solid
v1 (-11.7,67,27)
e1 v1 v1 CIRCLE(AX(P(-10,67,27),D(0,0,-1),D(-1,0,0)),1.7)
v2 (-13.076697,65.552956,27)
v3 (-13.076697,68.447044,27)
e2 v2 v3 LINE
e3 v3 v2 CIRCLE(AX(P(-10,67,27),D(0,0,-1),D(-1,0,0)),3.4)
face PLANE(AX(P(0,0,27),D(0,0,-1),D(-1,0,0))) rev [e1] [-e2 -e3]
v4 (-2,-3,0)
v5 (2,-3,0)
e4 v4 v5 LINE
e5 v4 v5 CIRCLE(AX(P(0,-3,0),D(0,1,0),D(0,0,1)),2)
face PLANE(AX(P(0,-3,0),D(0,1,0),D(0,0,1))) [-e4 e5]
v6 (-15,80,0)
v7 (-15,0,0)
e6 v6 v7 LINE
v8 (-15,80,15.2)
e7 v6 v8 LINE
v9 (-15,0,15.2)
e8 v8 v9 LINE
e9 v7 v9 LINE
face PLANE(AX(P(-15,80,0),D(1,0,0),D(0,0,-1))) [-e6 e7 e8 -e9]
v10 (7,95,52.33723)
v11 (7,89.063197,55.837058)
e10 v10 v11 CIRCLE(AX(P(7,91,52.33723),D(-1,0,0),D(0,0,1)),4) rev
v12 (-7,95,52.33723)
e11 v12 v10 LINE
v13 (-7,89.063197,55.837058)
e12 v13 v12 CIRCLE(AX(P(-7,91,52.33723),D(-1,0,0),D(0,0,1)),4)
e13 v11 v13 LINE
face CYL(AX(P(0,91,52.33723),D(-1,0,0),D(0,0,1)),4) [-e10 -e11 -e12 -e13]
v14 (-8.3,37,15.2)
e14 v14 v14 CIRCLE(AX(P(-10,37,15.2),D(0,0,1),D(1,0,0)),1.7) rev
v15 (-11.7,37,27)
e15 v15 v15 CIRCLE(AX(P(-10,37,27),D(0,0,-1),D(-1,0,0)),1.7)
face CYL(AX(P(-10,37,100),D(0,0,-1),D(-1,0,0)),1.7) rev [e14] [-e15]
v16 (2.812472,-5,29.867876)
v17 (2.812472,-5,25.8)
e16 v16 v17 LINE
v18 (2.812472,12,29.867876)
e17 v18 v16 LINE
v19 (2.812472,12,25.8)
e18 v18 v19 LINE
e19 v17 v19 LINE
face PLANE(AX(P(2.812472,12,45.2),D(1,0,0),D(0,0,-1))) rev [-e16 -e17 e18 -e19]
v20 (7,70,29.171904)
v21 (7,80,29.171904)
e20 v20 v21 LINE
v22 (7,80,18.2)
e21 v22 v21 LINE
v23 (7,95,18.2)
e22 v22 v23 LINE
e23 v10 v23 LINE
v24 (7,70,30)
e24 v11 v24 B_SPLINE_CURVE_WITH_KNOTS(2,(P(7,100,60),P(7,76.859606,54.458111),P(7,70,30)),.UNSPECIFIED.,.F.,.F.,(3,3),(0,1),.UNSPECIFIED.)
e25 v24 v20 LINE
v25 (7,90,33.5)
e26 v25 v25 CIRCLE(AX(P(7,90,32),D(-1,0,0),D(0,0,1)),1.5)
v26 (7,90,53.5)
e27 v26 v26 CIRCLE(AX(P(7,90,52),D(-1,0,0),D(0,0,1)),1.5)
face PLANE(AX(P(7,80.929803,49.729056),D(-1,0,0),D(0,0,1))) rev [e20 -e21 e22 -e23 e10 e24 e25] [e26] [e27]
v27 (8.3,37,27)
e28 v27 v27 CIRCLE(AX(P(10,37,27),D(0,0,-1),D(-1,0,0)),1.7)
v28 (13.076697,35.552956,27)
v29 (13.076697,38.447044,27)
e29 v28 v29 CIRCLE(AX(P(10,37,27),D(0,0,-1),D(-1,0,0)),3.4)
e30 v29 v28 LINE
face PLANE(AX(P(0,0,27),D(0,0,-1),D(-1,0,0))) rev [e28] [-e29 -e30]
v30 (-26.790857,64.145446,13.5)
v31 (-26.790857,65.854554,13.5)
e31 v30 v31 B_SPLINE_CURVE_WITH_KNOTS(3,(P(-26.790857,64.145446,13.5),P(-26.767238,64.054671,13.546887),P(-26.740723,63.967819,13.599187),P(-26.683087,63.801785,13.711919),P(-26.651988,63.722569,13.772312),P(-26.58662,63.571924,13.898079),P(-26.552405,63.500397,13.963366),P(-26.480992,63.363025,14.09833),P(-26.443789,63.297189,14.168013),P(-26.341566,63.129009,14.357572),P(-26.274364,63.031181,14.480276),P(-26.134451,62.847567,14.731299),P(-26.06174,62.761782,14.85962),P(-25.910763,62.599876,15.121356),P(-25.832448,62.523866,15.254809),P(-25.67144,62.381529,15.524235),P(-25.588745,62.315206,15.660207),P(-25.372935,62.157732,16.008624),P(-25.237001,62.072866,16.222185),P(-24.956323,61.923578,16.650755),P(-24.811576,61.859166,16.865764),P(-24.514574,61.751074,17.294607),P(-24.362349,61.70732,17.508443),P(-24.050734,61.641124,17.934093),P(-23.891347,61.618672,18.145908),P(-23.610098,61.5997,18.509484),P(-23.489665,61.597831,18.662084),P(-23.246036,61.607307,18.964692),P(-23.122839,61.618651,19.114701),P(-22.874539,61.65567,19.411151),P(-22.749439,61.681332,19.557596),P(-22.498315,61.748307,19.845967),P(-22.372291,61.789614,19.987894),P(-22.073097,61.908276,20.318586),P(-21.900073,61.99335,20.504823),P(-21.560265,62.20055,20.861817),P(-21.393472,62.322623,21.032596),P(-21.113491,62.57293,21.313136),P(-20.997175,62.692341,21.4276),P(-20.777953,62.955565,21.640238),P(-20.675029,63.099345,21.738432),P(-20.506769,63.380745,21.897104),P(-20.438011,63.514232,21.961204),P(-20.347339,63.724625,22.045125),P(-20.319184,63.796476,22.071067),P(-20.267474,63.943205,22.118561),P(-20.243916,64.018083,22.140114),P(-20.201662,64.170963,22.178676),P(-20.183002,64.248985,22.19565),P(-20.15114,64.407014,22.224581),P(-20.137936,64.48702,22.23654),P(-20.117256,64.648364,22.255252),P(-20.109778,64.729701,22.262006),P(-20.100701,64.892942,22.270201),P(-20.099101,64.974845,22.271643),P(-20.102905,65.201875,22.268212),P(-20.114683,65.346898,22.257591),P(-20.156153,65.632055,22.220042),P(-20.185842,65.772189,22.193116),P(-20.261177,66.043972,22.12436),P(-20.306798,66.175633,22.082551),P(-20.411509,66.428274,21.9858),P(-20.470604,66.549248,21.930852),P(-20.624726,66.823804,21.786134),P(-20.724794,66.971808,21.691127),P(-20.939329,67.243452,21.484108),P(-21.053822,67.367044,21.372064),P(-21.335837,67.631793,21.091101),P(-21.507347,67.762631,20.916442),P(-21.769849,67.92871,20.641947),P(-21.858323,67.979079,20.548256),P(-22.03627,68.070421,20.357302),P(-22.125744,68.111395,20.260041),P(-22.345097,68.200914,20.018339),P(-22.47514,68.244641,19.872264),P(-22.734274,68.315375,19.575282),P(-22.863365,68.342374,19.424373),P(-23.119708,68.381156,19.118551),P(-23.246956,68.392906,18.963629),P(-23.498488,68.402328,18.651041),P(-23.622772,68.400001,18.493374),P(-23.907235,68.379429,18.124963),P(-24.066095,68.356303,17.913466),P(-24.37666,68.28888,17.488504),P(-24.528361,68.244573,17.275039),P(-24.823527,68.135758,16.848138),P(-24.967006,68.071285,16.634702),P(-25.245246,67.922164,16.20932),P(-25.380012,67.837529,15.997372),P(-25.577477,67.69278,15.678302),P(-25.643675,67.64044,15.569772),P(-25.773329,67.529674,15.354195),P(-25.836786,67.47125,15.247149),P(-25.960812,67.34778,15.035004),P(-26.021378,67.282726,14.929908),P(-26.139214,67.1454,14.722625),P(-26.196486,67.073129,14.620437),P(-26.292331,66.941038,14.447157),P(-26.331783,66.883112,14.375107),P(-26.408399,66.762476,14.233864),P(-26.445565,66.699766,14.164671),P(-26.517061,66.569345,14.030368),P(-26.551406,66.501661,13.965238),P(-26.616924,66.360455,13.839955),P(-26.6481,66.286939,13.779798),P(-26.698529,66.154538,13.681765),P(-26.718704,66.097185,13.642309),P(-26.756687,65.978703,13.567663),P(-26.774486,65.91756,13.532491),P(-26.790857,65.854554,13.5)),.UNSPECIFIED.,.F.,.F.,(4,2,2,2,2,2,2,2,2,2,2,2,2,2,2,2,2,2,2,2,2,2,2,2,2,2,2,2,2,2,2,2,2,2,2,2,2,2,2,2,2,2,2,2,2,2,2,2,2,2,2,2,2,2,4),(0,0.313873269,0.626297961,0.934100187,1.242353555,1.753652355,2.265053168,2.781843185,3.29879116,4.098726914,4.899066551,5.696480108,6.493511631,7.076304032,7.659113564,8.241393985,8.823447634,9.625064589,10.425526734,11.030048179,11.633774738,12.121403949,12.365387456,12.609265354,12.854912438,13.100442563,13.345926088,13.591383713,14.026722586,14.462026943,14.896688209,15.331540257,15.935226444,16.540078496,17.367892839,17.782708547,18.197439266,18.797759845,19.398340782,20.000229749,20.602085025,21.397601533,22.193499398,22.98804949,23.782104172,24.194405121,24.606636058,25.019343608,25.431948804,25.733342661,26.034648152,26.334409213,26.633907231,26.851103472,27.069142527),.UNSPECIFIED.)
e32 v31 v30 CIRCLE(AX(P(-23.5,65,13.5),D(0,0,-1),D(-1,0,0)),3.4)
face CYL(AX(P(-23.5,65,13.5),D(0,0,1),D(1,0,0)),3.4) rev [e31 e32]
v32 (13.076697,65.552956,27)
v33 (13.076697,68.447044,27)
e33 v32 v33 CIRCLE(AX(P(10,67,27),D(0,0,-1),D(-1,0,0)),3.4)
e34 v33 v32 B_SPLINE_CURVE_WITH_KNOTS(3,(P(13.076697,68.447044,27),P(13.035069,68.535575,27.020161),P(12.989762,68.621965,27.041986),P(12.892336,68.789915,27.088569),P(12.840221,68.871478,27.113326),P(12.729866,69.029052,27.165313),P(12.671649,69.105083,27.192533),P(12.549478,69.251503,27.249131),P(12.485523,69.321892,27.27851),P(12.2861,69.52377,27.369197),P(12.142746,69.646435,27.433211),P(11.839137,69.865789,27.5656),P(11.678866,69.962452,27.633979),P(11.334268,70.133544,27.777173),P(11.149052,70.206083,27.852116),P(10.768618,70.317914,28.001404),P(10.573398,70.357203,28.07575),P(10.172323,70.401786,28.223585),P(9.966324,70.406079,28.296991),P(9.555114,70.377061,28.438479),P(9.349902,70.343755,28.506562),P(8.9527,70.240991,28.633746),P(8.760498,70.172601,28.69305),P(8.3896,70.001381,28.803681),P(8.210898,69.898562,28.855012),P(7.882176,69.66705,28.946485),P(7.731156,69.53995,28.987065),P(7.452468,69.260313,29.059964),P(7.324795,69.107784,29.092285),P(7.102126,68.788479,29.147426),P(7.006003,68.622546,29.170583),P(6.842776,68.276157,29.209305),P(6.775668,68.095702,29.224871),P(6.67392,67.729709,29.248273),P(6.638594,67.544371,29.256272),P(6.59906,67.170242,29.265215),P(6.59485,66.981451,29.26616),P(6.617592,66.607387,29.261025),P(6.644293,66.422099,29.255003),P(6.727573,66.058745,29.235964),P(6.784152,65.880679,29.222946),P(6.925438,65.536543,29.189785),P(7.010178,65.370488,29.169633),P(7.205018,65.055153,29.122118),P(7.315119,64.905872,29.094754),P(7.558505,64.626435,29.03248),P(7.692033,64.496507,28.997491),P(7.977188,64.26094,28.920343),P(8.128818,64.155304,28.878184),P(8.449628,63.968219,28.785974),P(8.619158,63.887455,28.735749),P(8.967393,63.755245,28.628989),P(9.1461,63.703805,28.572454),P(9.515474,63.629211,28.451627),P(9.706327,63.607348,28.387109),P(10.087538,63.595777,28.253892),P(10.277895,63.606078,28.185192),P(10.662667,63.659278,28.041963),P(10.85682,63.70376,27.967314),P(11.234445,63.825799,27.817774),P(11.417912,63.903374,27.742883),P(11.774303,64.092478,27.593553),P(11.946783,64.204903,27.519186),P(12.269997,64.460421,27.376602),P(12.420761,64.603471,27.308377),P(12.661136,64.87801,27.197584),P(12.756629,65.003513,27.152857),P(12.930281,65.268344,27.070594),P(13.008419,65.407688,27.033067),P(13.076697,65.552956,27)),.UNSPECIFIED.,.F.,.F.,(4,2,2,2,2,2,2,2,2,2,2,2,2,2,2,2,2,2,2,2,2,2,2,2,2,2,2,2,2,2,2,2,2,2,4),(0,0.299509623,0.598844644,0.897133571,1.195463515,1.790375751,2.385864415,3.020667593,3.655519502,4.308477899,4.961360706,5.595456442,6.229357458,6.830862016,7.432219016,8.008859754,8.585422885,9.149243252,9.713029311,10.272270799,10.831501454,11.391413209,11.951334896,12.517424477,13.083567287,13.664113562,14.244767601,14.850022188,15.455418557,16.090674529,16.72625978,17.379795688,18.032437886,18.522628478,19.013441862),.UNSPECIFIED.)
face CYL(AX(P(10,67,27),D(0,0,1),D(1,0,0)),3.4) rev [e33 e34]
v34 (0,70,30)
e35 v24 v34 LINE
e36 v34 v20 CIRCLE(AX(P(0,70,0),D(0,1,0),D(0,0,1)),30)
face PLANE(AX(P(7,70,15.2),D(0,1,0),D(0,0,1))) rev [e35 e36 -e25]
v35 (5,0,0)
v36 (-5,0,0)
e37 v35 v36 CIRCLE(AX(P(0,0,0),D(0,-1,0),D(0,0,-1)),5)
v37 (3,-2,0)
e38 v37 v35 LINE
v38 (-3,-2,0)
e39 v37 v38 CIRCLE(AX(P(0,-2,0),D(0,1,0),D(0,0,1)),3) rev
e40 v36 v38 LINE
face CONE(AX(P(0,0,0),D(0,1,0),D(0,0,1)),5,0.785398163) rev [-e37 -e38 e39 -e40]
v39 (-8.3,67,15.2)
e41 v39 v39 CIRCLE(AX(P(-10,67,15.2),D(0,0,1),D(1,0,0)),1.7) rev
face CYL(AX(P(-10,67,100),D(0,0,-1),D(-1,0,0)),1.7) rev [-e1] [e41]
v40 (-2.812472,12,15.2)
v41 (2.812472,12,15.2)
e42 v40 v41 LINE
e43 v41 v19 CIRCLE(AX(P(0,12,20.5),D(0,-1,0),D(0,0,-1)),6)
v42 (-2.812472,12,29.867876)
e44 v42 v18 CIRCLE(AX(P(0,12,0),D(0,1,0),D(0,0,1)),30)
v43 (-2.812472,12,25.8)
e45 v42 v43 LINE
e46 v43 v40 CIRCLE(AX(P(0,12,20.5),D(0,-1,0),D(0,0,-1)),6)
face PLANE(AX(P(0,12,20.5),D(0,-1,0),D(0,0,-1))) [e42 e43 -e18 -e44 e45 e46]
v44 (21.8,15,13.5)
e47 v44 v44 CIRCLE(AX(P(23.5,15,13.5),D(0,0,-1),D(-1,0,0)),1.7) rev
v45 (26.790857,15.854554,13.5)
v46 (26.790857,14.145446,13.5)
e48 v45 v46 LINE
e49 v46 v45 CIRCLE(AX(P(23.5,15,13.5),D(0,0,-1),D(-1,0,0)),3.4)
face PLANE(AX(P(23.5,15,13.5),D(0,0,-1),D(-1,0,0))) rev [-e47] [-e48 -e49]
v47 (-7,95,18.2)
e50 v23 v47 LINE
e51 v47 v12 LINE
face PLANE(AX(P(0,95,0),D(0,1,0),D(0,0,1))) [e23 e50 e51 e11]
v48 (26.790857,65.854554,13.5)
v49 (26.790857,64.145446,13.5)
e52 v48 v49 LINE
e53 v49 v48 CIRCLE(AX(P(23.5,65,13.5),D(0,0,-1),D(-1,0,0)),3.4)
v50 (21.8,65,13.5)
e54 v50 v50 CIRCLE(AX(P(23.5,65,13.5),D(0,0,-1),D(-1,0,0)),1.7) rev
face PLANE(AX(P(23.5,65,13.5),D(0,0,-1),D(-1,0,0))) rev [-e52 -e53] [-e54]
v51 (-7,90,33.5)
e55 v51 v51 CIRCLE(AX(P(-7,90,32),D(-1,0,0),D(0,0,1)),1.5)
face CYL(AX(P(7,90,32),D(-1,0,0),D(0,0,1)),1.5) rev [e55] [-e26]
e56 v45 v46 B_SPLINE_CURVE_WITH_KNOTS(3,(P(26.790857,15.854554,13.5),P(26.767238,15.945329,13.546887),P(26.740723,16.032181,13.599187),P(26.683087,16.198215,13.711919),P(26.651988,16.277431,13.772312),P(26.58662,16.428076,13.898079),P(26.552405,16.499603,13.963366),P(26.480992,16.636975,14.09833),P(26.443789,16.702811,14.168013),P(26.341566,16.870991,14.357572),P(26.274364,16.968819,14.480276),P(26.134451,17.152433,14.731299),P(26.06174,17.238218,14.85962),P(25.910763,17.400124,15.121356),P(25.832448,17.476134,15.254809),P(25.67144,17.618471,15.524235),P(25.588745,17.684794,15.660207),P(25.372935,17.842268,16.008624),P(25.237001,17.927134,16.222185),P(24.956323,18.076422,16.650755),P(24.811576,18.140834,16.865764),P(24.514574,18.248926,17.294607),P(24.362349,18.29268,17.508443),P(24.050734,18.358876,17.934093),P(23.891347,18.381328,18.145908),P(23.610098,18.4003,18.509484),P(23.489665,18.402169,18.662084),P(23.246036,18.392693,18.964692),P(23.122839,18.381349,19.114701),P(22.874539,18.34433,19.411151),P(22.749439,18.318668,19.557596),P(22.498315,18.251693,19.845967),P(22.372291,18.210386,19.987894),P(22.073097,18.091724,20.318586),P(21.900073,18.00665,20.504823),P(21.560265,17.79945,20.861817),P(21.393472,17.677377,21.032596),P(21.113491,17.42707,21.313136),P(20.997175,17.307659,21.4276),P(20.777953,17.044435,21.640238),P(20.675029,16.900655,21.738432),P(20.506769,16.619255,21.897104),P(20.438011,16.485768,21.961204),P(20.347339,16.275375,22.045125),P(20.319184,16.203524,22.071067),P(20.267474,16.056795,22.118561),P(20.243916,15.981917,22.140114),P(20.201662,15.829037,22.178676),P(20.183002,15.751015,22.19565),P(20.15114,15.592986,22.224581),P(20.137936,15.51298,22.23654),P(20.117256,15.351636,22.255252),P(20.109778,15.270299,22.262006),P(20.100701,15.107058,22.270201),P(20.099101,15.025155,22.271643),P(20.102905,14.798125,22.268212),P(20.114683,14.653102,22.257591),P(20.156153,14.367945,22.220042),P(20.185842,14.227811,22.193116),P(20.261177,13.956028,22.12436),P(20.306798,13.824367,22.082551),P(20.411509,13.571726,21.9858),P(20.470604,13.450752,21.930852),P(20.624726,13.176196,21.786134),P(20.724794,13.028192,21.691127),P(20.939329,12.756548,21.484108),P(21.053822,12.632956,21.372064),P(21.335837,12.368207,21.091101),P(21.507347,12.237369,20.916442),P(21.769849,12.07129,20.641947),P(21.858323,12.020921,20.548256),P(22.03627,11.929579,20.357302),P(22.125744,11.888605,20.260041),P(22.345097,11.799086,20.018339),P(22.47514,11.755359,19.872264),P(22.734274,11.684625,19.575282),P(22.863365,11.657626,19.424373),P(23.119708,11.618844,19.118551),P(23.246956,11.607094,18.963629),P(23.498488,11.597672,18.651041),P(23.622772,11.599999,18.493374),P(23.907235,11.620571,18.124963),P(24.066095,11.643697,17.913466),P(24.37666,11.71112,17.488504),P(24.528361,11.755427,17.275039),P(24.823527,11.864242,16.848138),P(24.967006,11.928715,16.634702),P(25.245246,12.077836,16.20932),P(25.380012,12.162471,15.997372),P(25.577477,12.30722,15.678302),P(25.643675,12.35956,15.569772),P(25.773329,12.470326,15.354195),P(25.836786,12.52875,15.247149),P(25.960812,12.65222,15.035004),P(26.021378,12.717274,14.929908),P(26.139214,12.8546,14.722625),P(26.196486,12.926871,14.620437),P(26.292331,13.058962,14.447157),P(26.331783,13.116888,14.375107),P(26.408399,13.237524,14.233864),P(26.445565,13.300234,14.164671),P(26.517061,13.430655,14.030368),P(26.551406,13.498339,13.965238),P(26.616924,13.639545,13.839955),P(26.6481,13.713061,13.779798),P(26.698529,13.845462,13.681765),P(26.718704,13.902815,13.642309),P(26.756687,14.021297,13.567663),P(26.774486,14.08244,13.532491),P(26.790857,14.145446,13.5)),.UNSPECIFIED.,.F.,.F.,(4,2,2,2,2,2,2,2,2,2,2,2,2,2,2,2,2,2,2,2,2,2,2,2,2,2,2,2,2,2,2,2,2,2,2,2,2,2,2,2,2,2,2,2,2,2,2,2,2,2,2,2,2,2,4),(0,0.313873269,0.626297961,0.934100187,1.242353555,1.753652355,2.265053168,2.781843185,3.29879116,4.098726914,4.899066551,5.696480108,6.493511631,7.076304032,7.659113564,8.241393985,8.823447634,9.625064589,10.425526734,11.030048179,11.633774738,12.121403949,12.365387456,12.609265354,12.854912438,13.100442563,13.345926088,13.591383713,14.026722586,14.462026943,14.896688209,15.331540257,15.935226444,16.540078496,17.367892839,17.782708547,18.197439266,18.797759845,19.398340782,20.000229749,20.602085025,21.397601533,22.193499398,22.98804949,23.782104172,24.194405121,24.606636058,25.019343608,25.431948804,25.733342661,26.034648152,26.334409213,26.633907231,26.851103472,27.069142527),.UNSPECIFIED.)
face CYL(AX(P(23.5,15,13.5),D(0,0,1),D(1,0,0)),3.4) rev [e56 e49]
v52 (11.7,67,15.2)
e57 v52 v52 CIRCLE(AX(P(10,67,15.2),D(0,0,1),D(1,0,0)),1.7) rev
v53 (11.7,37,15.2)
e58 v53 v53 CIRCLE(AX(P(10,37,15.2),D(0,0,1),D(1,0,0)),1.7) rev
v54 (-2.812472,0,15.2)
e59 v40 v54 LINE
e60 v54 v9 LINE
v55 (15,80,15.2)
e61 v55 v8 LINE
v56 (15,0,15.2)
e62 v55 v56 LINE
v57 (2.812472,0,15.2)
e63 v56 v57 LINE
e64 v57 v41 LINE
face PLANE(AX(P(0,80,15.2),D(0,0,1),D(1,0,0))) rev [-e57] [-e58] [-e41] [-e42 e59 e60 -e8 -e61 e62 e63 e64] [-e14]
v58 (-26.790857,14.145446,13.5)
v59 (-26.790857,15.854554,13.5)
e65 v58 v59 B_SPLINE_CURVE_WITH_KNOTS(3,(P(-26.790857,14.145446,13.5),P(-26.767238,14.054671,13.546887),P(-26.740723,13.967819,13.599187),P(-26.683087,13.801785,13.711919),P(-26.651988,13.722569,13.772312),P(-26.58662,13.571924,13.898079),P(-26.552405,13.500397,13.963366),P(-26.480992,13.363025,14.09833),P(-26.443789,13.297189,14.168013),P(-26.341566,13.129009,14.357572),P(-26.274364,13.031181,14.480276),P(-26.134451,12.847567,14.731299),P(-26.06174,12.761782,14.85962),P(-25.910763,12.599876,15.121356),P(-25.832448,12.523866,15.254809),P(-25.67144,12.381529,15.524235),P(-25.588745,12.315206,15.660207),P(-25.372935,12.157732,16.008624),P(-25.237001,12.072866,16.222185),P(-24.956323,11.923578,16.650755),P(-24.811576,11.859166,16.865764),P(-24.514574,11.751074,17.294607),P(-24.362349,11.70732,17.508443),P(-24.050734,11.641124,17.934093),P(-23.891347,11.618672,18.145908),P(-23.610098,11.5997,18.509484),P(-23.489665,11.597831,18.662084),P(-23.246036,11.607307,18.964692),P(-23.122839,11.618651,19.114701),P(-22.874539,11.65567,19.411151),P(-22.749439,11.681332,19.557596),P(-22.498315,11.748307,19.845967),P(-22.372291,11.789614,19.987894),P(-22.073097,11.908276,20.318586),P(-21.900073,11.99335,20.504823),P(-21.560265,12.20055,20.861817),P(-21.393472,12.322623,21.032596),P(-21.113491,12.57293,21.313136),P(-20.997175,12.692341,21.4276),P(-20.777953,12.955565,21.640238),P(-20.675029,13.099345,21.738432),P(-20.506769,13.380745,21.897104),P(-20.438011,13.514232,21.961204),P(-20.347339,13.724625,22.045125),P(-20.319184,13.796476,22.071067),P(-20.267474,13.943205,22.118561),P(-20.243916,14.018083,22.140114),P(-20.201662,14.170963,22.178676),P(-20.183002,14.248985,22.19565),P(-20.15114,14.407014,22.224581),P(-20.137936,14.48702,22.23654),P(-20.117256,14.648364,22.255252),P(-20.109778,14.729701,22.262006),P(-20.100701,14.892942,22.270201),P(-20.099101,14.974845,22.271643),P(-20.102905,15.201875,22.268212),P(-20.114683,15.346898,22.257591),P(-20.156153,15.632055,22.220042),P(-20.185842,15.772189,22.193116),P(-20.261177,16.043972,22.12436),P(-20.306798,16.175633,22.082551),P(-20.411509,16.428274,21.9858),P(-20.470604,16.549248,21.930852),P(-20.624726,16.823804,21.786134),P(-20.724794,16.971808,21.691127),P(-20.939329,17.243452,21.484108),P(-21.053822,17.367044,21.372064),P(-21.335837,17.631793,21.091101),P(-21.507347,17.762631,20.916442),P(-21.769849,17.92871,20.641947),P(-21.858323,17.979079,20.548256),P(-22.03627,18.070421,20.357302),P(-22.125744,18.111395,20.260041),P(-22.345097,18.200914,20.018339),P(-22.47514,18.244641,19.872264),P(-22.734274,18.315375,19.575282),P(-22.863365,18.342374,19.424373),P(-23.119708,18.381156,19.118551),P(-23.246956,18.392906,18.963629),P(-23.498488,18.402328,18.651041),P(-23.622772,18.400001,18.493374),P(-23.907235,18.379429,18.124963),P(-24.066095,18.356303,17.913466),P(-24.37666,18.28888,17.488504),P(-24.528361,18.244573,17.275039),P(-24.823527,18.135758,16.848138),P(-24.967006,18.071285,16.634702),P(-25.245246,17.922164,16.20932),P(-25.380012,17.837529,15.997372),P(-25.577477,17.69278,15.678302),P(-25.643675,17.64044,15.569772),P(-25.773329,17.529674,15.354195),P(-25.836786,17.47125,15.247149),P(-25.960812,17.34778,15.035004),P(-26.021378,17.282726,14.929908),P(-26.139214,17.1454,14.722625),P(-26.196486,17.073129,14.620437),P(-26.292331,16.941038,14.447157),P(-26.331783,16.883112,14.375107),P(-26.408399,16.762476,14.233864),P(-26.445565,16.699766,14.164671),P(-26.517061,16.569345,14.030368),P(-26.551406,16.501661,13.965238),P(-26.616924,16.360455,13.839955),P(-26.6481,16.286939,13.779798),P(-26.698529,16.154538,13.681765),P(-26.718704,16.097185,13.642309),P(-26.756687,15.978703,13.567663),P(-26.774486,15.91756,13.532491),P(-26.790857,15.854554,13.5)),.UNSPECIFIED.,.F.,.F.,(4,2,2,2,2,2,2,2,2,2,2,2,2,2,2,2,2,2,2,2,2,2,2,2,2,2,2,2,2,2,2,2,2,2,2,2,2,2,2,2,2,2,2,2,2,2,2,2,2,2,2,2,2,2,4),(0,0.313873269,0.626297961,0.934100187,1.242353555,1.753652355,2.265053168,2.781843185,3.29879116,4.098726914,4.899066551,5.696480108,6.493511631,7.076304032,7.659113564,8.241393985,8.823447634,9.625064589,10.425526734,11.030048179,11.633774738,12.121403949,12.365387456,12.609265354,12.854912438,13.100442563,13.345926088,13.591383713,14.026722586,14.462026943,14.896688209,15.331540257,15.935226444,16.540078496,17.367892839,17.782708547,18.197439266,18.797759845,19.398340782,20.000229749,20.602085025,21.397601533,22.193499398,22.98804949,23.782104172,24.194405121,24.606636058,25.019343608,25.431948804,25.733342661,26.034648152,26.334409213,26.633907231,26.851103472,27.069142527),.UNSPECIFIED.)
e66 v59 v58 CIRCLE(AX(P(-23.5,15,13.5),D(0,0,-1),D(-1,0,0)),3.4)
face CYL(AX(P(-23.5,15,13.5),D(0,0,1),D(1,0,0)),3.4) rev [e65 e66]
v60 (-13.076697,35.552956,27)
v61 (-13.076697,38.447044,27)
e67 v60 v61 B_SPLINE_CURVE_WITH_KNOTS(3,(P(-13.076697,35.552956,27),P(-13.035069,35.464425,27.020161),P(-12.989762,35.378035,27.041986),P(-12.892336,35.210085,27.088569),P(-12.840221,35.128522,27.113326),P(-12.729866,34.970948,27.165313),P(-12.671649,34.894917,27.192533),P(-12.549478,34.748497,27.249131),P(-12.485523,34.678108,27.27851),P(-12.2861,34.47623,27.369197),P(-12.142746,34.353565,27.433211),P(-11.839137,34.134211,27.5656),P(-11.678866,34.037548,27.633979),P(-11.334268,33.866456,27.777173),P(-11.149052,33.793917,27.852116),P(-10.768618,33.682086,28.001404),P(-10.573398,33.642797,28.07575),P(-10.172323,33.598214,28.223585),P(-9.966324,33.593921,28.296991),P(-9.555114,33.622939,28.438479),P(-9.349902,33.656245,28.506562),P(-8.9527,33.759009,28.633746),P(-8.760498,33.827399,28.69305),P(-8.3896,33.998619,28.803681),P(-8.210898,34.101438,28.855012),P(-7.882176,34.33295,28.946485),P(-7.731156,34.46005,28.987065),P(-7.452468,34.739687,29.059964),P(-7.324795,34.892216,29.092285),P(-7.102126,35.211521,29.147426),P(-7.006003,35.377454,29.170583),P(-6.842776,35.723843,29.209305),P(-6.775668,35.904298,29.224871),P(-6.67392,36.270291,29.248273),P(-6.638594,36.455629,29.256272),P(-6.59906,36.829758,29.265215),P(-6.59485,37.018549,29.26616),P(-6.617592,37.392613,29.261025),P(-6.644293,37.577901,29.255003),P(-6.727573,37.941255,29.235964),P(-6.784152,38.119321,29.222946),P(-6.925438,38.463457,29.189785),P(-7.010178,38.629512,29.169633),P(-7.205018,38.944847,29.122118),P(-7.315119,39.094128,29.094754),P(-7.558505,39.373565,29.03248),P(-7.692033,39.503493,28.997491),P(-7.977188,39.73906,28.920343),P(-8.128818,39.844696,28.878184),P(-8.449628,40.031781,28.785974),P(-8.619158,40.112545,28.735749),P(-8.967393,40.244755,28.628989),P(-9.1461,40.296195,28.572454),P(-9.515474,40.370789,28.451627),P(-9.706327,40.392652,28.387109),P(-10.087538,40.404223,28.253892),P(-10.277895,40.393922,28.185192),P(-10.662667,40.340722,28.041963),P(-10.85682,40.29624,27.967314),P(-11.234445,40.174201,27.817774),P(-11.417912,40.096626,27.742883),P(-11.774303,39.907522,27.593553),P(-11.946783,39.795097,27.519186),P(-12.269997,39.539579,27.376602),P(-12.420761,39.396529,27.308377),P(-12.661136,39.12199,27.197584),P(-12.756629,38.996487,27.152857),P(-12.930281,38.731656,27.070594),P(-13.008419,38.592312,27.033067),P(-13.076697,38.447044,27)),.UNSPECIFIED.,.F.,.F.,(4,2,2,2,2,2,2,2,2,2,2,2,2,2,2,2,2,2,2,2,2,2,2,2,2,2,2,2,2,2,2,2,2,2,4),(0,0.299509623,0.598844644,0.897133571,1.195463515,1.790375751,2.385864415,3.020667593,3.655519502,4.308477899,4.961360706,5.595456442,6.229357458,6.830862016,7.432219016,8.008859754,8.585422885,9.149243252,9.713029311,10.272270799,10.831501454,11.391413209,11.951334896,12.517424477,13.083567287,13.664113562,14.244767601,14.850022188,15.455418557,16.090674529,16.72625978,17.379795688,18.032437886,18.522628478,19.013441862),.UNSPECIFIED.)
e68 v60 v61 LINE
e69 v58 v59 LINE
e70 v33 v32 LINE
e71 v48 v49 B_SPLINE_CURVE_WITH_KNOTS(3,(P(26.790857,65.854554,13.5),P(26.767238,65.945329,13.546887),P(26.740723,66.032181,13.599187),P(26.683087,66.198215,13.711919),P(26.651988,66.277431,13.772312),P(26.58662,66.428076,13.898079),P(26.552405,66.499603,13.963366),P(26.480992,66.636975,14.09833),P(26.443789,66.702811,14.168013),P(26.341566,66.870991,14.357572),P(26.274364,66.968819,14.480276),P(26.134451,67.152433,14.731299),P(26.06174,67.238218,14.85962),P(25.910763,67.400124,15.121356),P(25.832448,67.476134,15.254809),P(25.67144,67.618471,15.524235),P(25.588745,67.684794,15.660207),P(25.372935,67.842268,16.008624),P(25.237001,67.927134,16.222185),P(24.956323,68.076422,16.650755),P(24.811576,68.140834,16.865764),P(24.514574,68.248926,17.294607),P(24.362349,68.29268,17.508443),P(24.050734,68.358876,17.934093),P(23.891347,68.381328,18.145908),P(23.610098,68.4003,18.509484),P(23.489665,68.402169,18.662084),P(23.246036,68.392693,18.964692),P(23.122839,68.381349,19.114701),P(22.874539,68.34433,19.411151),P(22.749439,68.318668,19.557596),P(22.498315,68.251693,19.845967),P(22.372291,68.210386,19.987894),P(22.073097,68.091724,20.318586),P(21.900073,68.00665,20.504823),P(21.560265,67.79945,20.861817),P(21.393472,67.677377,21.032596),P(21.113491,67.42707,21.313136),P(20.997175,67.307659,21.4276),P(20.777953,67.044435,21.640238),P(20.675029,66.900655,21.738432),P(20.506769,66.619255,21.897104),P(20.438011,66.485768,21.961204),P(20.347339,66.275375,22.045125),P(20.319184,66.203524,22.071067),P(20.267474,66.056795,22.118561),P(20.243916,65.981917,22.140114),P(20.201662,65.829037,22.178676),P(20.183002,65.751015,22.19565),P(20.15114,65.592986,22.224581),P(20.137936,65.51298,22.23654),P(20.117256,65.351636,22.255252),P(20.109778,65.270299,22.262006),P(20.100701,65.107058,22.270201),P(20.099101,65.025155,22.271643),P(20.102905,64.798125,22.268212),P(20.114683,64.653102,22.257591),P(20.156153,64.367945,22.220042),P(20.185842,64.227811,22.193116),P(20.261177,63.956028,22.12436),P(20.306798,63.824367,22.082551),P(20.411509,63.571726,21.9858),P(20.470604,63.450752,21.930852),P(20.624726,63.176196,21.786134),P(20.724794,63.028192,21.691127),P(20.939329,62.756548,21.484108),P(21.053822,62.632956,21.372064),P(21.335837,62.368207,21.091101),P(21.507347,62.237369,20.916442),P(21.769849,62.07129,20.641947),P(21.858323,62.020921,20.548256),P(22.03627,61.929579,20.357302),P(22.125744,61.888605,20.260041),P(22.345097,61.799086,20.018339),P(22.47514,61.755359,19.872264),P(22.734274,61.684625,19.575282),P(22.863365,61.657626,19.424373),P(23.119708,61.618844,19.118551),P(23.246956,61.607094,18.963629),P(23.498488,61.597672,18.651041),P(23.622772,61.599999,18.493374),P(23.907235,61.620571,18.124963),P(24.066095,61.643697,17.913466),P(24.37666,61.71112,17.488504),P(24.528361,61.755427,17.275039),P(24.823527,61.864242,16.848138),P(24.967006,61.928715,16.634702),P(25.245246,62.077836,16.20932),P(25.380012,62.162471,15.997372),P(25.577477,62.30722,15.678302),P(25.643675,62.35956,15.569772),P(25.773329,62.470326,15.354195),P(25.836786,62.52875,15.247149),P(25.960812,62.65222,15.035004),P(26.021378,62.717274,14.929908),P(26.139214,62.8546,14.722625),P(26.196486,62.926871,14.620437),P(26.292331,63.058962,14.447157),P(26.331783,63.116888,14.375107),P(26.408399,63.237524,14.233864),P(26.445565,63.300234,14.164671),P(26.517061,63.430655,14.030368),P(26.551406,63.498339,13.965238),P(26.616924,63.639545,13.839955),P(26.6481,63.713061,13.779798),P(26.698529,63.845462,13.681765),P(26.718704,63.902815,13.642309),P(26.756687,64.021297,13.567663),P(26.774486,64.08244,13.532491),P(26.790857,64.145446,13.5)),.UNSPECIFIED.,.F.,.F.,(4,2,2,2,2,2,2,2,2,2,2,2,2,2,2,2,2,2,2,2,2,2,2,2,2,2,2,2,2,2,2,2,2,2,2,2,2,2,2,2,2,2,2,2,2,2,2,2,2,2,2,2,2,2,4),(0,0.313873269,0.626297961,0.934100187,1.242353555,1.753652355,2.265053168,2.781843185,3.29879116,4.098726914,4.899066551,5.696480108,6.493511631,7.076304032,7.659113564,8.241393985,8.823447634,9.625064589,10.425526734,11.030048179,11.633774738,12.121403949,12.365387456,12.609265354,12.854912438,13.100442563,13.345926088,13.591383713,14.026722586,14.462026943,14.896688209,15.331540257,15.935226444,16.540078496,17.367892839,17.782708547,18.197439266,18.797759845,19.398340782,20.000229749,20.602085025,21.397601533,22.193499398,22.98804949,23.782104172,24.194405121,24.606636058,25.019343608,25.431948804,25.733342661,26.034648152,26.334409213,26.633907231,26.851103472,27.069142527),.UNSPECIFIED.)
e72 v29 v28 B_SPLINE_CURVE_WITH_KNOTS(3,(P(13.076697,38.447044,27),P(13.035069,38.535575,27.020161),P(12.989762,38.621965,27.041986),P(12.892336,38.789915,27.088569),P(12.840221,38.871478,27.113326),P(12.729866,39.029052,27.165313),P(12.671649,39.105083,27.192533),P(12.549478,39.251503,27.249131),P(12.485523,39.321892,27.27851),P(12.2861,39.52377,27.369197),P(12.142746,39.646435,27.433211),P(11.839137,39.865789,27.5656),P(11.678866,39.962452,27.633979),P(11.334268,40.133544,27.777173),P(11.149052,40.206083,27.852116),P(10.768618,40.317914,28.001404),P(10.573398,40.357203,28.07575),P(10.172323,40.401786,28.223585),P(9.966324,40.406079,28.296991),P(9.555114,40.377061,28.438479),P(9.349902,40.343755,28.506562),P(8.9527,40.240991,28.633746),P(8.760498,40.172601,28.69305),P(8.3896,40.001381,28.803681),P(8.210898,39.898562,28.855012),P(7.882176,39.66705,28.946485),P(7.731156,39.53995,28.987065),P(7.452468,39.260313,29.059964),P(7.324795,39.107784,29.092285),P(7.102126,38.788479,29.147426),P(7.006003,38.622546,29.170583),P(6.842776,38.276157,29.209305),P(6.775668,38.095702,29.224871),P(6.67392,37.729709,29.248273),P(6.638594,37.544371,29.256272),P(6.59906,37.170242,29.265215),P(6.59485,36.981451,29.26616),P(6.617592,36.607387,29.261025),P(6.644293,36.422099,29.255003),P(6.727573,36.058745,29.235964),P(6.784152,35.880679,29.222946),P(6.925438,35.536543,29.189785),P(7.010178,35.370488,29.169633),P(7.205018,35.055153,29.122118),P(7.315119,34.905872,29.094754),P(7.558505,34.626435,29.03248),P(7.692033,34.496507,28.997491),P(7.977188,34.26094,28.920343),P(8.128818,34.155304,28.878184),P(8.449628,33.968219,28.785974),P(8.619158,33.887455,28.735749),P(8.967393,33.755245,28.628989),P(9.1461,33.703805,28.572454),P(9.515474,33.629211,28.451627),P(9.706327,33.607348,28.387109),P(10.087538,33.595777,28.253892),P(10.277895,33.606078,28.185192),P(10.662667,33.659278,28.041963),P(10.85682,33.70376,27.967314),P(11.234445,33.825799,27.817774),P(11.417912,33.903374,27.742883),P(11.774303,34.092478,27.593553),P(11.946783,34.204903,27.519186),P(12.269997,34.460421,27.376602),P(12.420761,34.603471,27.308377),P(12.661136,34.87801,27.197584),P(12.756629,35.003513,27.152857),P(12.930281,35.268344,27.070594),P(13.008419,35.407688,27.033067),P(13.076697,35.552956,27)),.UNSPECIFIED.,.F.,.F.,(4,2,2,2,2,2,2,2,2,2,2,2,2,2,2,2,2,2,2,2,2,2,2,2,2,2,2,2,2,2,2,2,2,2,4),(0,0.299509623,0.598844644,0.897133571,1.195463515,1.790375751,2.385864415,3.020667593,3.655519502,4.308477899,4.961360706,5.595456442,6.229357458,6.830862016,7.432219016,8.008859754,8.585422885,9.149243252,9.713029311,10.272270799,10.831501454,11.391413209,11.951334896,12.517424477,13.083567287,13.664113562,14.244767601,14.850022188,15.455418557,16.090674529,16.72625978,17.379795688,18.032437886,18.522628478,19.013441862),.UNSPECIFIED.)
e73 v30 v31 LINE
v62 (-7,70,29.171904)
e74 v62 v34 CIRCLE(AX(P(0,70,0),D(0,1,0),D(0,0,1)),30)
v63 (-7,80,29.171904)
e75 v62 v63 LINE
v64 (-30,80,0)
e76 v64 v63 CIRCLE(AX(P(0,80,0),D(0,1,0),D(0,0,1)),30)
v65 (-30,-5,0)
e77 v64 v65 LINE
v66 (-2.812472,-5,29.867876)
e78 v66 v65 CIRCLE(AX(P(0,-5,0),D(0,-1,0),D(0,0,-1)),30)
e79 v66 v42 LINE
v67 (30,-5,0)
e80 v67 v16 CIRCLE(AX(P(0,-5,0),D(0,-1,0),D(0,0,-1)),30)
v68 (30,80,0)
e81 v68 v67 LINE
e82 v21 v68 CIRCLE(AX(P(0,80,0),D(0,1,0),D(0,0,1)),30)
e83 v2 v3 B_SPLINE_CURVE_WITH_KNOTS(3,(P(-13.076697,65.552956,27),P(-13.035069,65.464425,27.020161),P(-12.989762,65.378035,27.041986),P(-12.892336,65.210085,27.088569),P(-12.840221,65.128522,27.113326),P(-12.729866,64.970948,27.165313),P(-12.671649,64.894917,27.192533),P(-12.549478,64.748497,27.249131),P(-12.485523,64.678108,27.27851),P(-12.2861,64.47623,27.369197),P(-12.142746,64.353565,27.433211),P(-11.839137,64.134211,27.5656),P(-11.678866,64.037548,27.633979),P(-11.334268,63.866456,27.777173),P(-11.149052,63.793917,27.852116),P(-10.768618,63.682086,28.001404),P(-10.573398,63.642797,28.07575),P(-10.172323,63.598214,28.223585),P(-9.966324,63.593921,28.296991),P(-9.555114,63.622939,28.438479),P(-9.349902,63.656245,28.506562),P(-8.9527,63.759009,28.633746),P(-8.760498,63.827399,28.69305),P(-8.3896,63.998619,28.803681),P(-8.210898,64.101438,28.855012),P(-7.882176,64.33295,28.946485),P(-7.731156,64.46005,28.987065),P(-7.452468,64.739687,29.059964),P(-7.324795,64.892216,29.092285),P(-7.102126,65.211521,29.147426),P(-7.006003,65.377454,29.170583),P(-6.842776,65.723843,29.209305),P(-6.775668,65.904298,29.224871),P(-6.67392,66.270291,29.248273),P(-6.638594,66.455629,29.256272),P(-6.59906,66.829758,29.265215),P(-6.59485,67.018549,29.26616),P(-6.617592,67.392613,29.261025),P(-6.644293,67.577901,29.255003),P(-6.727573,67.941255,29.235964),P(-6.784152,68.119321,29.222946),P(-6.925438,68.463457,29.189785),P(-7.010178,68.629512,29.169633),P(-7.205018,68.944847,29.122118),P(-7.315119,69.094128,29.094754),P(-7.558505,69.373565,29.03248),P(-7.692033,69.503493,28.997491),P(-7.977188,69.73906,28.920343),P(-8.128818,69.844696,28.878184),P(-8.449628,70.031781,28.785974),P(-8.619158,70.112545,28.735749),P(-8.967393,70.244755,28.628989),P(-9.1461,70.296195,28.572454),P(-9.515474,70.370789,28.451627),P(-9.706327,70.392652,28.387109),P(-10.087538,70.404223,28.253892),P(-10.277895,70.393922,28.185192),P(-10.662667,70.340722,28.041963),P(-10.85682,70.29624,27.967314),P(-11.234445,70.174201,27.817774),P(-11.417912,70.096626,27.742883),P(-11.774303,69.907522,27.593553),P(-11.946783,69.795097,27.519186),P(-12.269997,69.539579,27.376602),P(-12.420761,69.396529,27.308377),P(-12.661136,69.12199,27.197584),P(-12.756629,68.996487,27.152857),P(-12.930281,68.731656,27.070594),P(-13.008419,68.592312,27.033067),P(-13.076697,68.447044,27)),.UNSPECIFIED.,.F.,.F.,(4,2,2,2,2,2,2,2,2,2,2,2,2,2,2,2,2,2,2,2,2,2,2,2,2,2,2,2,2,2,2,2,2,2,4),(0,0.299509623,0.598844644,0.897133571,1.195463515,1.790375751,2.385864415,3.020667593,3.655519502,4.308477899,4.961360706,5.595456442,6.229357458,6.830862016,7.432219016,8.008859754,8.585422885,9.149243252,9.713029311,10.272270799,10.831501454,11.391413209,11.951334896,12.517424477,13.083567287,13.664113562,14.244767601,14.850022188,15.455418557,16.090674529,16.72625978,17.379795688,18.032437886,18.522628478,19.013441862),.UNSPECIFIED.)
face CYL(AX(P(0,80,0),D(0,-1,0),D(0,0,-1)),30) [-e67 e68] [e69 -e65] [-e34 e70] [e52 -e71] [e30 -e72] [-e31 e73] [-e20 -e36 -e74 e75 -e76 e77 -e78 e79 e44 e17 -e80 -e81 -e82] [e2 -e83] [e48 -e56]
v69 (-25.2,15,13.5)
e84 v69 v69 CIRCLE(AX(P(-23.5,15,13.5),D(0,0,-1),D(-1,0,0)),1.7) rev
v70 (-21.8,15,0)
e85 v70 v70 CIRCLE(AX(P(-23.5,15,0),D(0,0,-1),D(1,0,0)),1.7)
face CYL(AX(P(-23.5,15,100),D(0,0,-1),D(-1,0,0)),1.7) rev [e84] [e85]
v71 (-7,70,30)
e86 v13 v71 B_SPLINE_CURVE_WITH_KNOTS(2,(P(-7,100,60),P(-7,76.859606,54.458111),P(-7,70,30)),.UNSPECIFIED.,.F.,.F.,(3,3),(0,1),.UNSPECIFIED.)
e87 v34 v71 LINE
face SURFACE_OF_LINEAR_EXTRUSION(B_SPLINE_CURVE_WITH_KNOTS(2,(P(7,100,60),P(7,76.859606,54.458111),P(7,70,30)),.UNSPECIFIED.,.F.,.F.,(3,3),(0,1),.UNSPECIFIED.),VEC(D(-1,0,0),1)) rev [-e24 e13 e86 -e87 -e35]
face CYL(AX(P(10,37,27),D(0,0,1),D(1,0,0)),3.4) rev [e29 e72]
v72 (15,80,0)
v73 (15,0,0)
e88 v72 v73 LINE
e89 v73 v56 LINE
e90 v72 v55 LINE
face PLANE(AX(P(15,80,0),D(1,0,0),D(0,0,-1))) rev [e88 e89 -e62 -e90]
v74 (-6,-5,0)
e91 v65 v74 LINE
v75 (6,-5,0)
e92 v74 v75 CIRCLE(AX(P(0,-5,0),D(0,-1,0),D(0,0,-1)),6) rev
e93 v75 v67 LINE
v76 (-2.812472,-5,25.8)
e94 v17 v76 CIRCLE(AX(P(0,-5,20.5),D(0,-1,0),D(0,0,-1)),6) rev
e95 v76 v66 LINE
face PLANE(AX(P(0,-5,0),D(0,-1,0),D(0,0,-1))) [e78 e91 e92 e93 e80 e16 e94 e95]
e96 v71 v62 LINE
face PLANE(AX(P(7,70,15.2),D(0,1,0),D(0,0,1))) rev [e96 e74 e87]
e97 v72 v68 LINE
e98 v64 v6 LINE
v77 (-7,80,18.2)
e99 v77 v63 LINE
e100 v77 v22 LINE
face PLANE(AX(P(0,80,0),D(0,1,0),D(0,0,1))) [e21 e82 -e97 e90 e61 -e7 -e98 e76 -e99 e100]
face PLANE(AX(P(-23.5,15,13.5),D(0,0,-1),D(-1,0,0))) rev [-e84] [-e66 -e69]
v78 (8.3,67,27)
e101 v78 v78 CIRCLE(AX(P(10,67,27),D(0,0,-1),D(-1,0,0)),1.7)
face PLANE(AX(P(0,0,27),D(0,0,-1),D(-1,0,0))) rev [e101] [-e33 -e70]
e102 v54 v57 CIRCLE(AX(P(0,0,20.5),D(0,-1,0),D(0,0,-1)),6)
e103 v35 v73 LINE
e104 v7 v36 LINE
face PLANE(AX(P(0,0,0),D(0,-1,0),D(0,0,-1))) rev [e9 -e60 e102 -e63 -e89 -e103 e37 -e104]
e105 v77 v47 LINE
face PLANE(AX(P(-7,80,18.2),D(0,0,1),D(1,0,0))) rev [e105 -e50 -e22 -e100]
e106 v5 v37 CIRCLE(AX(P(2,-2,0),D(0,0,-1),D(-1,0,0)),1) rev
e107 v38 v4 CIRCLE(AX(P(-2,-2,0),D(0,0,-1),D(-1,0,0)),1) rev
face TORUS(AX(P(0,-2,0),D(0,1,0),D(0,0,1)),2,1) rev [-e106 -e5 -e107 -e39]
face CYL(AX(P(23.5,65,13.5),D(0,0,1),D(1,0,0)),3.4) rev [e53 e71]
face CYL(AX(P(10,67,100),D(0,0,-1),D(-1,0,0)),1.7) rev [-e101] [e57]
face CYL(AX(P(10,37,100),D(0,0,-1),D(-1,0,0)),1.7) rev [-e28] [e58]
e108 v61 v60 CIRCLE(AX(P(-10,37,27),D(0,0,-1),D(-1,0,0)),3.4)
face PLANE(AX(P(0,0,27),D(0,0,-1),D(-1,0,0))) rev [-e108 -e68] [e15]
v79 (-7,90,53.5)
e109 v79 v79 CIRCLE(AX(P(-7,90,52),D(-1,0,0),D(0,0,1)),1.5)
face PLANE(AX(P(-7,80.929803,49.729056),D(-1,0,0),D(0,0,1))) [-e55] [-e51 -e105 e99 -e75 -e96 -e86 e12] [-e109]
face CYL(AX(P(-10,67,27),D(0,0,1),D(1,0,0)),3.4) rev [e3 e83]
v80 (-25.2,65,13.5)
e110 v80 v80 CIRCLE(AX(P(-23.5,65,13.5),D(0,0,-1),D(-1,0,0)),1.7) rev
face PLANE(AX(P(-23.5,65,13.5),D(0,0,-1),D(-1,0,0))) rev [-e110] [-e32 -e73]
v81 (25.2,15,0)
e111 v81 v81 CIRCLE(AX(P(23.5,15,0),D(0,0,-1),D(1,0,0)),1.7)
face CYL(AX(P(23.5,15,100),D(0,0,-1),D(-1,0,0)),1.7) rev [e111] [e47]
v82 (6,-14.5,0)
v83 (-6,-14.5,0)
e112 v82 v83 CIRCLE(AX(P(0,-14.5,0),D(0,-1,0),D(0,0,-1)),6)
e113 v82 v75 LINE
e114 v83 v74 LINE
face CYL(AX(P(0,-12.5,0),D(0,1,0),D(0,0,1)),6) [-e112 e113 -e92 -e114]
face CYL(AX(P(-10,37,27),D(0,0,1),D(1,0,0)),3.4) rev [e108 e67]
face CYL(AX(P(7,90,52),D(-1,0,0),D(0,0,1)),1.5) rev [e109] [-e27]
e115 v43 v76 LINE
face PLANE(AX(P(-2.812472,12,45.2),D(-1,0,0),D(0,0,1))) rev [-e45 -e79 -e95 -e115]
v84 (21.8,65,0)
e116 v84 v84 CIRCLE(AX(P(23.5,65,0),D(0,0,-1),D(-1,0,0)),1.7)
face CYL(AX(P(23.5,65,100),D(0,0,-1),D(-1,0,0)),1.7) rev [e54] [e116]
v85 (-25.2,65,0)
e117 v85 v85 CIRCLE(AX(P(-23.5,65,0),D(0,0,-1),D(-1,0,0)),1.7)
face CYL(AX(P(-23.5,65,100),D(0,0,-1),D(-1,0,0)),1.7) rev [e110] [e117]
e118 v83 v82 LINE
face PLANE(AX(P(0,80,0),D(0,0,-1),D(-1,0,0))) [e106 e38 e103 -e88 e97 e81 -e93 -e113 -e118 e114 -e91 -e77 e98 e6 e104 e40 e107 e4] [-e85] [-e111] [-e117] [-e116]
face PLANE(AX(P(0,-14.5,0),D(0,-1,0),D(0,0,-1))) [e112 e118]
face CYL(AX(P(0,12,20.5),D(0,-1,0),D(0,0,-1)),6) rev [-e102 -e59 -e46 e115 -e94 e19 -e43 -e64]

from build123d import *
from build123d.topology import SkipClean

# Parameters (mm, degrees)
EXTRUDE_1_DEPTH      = 80
SKETCH_2_R           = 1.7
CUT_EXTRUDE_1_DEPTH  = 100
SKETCH_3_R           = 1.7
CUT_EXTRUDE_2_DEPTH  = 100
SKETCH_4_R           = 3.4
CUT_EXTRUDE_3_DEPTH  = 26.5
SKETCH_5_R           = 3.4
CUT_EXTRUDE_4_DEPTH  = 13
EXTRUDE_START        = 3
EXTRUDE_2_DEPTH      = 3
EXTRUDE_3_DEPTH      = 9.5
EXTRUDE_4_DEPTH      = 7
SKETCH_14_R          = 1.5
CUT_EXTRUDE_6_DEPTH  = 14
SKETCH_18_W          = 14
SKETCH_18_H          = 3
CUT_EXTRUDE_9_DEPTH  = 20
SKETCH_19_R          = 3
CUT_EXTRUDE_10_DEPTH = 3
FILLET_4_R           = 1
CHAMFER_2_SIZE       = 2
SKETCH_20_R          = 6
CUT_EXTRUDE_11_DEPTH = 15
SKETCH_23_W          = 5.624944444
SKETCH_23_H          = 15.463858562
CUT_EXTRUDE_14_DEPTH = 30
SKETCH_25_W          = 14
SKETCH_25_H          = 41.8
CUT_EXTRUDE_16_DEPTH = 5
FILLET_6_R           = 4
EXTRUDE_START_2      = 2
EXTRUDE_5_DEPTH      = 2
EXTRUDE_6_DEPTH      = 2


# Some blends are built 0.0001 mm under size
with BuildPart() as part:
    # 草图1 → 凸台-拉伸1 (new body)
    with BuildSketch(Plane(origin=(0, 0, 0), x_dir=(1, 0, 0), z_dir=(0, 1, 0))):
        with BuildLine():
            Line((-15, 0), (-30, 0))
            ThreePointArc((-30, 0), (0, -30), (30, 0))
            Line((30, 0), (15, 0))
            Line((15, 0), (15, -15.2))
            Line((15, -15.2), (-15, -15.2))
            Line((-15, -15.2), (-15, 0))
        make_face()
    extrude(amount=EXTRUDE_1_DEPTH)

    # 草图2 → 切除-拉伸1 (cut)
    with BuildSketch(Plane.XY):
        with Locations(Location((-10, 37, 0), (0, 0, 180))):
            Circle(SKETCH_2_R)
        with Locations(Location((-10, 67, 0), (0, 0, 180))):
            Circle(SKETCH_2_R)
        with Locations(Location((10, 37, 0), (0, 0, 180))):
            Circle(SKETCH_2_R)
        with Locations(Location((10, 67, 0), (0, 0, 180))):
            Circle(SKETCH_2_R)
    extrude(amount=CUT_EXTRUDE_1_DEPTH, mode=Mode.SUBTRACT)

    # 草图3 → 切除-拉伸2 (cut)
    with BuildSketch(Plane(origin=(0, 0, 0), x_dir=(-1, 0, 0), z_dir=(0, 0, -1))):
        with Locations((23.5, 65)):
            Circle(SKETCH_3_R)
        with Locations((-23.5, 65)):
            Circle(SKETCH_3_R)
        with Locations((23.5, 15)):
            Circle(SKETCH_3_R)
        with Locations((-23.5, 15)):
            Circle(SKETCH_3_R)
    extrude(amount=-CUT_EXTRUDE_2_DEPTH, mode=Mode.SUBTRACT)

    # 草图4 → 切除-拉伸3 (cut)
    with BuildSketch(Plane(origin=(0, 0, 40), x_dir=(-1, 0, 0), z_dir=(0, 0, -1))):
        with Locations((-23.5, 65)):
            Circle(SKETCH_4_R)
        with Locations((-23.5, 15)):
            Circle(SKETCH_4_R)
        with Locations((23.5, 65)):
            Circle(SKETCH_4_R)
        with Locations((23.5, 15)):
            Circle(SKETCH_4_R)
    extrude(amount=CUT_EXTRUDE_3_DEPTH, mode=Mode.SUBTRACT)

    # 草图5 → 切除-拉伸4 (cut)
    with BuildSketch(Plane(origin=(0, 0, 40), x_dir=(-1, 0, 0), z_dir=(0, 0, -1))):
        with Locations((-10, 37)):
            Circle(SKETCH_5_R)
        with Locations((10, 37)):
            Circle(SKETCH_5_R)
        with Locations((10, 67)):
            Circle(SKETCH_5_R)
        with Locations((-10, 67)):
            Circle(SKETCH_5_R)
    extrude(amount=CUT_EXTRUDE_4_DEPTH, mode=Mode.SUBTRACT)

    # 草图6 → 凸台-拉伸2 (add)
    with SkipClean():  # the faces are left unmerged after this step: merging them gives an invalid solid
        with BuildSketch(Plane.XZ.offset(EXTRUDE_START)):
            with BuildLine():
                Line((-30, 0), (30, 0))
                ThreePointArc((30, 0), (0, 30), (-30, 0))
            make_face()
        extrude(amount=-EXTRUDE_2_DEPTH)

    # 草图7 → 凸台-拉伸3 (add)
    with SkipClean():  # the faces are left unmerged after this step: merging them gives an invalid solid
        with BuildSketch(Plane.XZ.offset(3)):
            with BuildLine():
                Line((-6, 0), (6, 0))
                ThreePointArc((6, 0), (0, 6), (-6, 0))
            make_face()
        extrude(amount=EXTRUDE_3_DEPTH)

    # 草图13 → 凸台-拉伸4 (add, symmetric)
    with SkipClean():  # the faces are left unmerged after this step: merging them gives an invalid solid
        with BuildSketch(Plane(origin=(0, 0, 0), x_dir=(0, 0, -1), z_dir=(1, 0, 0))):
            with BuildLine():
                Line((-15.2, 100), (-60, 100))
                add(Edge.make_bspline(
                    [(-60, 100), (-54.458111129, 76.859605584), (-30, 70)],
                    knots=[0, 0, 0, 1, 1, 1], degree=2))
                Line((-30, 70), (-15.2, 70))
                Line((-15.2, 70), (-15.2, 100))
            make_face()
        extrude(amount=EXTRUDE_4_DEPTH, both=True)

    # 草图14 → 切除-拉伸6 (cut)
    with SkipClean():  # the faces are left unmerged after this step: merging them gives an invalid solid
        with BuildSketch(Plane.ZY.offset(7)):
            with Locations((32, 90)):
                Circle(SKETCH_14_R)
            with Locations((52, 90)):
                Circle(SKETCH_14_R)
        extrude(amount=-CUT_EXTRUDE_6_DEPTH, mode=Mode.SUBTRACT)

    # 草图18 → 切除-拉伸9 (cut)
    with SkipClean():  # the faces are left unmerged after this step: merging them gives an invalid solid
        with BuildSketch(Plane(origin=(0, 100, 0), x_dir=(1, 0, 0), z_dir=(0, 1, 0))):
            with Locations((0, -16.7)):
                Rectangle(SKETCH_18_W, SKETCH_18_H)
        extrude(amount=-CUT_EXTRUDE_9_DEPTH, mode=Mode.SUBTRACT)

    # 草图19 → 切除-拉伸10 (cut)
    with SkipClean():  # the faces are left unmerged after this step: merging them gives an invalid solid
        with BuildSketch(Plane(origin=(0, 0, 0), x_dir=(1, 0, 0), z_dir=(0, 1, 0))):
            Circle(SKETCH_19_R)
        extrude(amount=-CUT_EXTRUDE_10_DEPTH, mode=Mode.SUBTRACT)

    # 圆角4
    # the kernel refuses this fillet: 1 mm, written as the material it adds along each edge
    with BuildSketch(Plane(origin=(0, -3, 0), x_dir=(-1, 0, 0), z_dir=(0, 0, -1))) as fillet_4_piece_1:
        with BuildLine():
            CenterArc((3 - FILLET_4_R, FILLET_4_R), FILLET_4_R, 270, 90)
            Line((3 - FILLET_4_R, 0), (3, 0))
            Line((3, 0), (3, FILLET_4_R))
        make_face()
    revolve(axis=Axis((0, -3, 0), (0, 1, 0)), revolution_arc=180)

    # 倒角2
    chamfer_2_edges = [part.edges().sort_by_distance(p)[0] for p in [
        (0, 0, 3),
    ]]
    chamfer(chamfer_2_edges, length=CHAMFER_2_SIZE - 0.0001)  # a hair under: the kernel refuses the full size

    # 草图20 → 切除-拉伸11 (cut)
    with BuildSketch(Plane.XZ.offset(3)):
        with Locations(Location((0, 20.5, 0), (0, 0, 270))):
            Circle(SKETCH_20_R)
    extrude(amount=-CUT_EXTRUDE_11_DEPTH, mode=Mode.SUBTRACT)

    # 草图23 → 切除-拉伸14 (cut)
    with BuildSketch(Plane(origin=(0, 0, 15.2), x_dir=(-1, 0, 0), z_dir=(0, 0, -1))):
        with Locations((0, 4.268070719)):
            Rectangle(SKETCH_23_W, SKETCH_23_H)
    extrude(amount=-CUT_EXTRUDE_14_DEPTH, mode=Mode.SUBTRACT)

    # 草图25 → 切除-拉伸16 (cut)
    with BuildSketch(Plane(origin=(0, 100, 0), x_dir=(1, 0, 0), z_dir=(0, 1, 0))):
        with Locations((0, -39.1)):
            Rectangle(SKETCH_25_W, SKETCH_25_H)
    extrude(amount=-CUT_EXTRUDE_16_DEPTH, mode=Mode.SUBTRACT)

    # 圆角6
    fillet_6_edges = [part.edges().sort_by_distance(p)[0] for p in [
        (3.4999997, 95, 58.513859135),
    ]]
    fillet(fillet_6_edges, radius=FILLET_6_R)

    # 草图26 → 凸台-拉伸5 (add)
    with BuildSketch(Plane.XZ.offset(3).offset(EXTRUDE_START_2)):
        with BuildLine():
            ThreePointArc((30, 0), (22.185289796, 20.194378343), (2.812472222, 29.86787572))
            Line((2.812472222, 29.86787572), (2.812472222, 25.8))
            ThreePointArc((2.812472222, 25.8), (0, 14.5), (-2.812472222, 25.8))
            Line((-2.812472222, 25.8), (-2.812472222, 29.86787572))
            ThreePointArc((-2.812472222, 29.86787572), (-22.185289796, 20.194378343), (-30, 0))
            Line((-30, 0), (-6, 0))
            ThreePointArc((-6, 0), (0, 6), (6, 0))
            Line((6, 0), (30, 0))
        make_face()
    extrude(amount=-EXTRUDE_5_DEPTH)

    # 草图27 → 凸台-拉伸6 (add)
    with BuildSketch(Plane.XZ.offset(12.5)):
        with BuildLine():
            Line((-6, 0), (6, 0))
            ThreePointArc((6, 0), (0, 6), (-6, 0))
        make_face()
    extrude(amount=EXTRUDE_6_DEPTH)


solid = part.part
